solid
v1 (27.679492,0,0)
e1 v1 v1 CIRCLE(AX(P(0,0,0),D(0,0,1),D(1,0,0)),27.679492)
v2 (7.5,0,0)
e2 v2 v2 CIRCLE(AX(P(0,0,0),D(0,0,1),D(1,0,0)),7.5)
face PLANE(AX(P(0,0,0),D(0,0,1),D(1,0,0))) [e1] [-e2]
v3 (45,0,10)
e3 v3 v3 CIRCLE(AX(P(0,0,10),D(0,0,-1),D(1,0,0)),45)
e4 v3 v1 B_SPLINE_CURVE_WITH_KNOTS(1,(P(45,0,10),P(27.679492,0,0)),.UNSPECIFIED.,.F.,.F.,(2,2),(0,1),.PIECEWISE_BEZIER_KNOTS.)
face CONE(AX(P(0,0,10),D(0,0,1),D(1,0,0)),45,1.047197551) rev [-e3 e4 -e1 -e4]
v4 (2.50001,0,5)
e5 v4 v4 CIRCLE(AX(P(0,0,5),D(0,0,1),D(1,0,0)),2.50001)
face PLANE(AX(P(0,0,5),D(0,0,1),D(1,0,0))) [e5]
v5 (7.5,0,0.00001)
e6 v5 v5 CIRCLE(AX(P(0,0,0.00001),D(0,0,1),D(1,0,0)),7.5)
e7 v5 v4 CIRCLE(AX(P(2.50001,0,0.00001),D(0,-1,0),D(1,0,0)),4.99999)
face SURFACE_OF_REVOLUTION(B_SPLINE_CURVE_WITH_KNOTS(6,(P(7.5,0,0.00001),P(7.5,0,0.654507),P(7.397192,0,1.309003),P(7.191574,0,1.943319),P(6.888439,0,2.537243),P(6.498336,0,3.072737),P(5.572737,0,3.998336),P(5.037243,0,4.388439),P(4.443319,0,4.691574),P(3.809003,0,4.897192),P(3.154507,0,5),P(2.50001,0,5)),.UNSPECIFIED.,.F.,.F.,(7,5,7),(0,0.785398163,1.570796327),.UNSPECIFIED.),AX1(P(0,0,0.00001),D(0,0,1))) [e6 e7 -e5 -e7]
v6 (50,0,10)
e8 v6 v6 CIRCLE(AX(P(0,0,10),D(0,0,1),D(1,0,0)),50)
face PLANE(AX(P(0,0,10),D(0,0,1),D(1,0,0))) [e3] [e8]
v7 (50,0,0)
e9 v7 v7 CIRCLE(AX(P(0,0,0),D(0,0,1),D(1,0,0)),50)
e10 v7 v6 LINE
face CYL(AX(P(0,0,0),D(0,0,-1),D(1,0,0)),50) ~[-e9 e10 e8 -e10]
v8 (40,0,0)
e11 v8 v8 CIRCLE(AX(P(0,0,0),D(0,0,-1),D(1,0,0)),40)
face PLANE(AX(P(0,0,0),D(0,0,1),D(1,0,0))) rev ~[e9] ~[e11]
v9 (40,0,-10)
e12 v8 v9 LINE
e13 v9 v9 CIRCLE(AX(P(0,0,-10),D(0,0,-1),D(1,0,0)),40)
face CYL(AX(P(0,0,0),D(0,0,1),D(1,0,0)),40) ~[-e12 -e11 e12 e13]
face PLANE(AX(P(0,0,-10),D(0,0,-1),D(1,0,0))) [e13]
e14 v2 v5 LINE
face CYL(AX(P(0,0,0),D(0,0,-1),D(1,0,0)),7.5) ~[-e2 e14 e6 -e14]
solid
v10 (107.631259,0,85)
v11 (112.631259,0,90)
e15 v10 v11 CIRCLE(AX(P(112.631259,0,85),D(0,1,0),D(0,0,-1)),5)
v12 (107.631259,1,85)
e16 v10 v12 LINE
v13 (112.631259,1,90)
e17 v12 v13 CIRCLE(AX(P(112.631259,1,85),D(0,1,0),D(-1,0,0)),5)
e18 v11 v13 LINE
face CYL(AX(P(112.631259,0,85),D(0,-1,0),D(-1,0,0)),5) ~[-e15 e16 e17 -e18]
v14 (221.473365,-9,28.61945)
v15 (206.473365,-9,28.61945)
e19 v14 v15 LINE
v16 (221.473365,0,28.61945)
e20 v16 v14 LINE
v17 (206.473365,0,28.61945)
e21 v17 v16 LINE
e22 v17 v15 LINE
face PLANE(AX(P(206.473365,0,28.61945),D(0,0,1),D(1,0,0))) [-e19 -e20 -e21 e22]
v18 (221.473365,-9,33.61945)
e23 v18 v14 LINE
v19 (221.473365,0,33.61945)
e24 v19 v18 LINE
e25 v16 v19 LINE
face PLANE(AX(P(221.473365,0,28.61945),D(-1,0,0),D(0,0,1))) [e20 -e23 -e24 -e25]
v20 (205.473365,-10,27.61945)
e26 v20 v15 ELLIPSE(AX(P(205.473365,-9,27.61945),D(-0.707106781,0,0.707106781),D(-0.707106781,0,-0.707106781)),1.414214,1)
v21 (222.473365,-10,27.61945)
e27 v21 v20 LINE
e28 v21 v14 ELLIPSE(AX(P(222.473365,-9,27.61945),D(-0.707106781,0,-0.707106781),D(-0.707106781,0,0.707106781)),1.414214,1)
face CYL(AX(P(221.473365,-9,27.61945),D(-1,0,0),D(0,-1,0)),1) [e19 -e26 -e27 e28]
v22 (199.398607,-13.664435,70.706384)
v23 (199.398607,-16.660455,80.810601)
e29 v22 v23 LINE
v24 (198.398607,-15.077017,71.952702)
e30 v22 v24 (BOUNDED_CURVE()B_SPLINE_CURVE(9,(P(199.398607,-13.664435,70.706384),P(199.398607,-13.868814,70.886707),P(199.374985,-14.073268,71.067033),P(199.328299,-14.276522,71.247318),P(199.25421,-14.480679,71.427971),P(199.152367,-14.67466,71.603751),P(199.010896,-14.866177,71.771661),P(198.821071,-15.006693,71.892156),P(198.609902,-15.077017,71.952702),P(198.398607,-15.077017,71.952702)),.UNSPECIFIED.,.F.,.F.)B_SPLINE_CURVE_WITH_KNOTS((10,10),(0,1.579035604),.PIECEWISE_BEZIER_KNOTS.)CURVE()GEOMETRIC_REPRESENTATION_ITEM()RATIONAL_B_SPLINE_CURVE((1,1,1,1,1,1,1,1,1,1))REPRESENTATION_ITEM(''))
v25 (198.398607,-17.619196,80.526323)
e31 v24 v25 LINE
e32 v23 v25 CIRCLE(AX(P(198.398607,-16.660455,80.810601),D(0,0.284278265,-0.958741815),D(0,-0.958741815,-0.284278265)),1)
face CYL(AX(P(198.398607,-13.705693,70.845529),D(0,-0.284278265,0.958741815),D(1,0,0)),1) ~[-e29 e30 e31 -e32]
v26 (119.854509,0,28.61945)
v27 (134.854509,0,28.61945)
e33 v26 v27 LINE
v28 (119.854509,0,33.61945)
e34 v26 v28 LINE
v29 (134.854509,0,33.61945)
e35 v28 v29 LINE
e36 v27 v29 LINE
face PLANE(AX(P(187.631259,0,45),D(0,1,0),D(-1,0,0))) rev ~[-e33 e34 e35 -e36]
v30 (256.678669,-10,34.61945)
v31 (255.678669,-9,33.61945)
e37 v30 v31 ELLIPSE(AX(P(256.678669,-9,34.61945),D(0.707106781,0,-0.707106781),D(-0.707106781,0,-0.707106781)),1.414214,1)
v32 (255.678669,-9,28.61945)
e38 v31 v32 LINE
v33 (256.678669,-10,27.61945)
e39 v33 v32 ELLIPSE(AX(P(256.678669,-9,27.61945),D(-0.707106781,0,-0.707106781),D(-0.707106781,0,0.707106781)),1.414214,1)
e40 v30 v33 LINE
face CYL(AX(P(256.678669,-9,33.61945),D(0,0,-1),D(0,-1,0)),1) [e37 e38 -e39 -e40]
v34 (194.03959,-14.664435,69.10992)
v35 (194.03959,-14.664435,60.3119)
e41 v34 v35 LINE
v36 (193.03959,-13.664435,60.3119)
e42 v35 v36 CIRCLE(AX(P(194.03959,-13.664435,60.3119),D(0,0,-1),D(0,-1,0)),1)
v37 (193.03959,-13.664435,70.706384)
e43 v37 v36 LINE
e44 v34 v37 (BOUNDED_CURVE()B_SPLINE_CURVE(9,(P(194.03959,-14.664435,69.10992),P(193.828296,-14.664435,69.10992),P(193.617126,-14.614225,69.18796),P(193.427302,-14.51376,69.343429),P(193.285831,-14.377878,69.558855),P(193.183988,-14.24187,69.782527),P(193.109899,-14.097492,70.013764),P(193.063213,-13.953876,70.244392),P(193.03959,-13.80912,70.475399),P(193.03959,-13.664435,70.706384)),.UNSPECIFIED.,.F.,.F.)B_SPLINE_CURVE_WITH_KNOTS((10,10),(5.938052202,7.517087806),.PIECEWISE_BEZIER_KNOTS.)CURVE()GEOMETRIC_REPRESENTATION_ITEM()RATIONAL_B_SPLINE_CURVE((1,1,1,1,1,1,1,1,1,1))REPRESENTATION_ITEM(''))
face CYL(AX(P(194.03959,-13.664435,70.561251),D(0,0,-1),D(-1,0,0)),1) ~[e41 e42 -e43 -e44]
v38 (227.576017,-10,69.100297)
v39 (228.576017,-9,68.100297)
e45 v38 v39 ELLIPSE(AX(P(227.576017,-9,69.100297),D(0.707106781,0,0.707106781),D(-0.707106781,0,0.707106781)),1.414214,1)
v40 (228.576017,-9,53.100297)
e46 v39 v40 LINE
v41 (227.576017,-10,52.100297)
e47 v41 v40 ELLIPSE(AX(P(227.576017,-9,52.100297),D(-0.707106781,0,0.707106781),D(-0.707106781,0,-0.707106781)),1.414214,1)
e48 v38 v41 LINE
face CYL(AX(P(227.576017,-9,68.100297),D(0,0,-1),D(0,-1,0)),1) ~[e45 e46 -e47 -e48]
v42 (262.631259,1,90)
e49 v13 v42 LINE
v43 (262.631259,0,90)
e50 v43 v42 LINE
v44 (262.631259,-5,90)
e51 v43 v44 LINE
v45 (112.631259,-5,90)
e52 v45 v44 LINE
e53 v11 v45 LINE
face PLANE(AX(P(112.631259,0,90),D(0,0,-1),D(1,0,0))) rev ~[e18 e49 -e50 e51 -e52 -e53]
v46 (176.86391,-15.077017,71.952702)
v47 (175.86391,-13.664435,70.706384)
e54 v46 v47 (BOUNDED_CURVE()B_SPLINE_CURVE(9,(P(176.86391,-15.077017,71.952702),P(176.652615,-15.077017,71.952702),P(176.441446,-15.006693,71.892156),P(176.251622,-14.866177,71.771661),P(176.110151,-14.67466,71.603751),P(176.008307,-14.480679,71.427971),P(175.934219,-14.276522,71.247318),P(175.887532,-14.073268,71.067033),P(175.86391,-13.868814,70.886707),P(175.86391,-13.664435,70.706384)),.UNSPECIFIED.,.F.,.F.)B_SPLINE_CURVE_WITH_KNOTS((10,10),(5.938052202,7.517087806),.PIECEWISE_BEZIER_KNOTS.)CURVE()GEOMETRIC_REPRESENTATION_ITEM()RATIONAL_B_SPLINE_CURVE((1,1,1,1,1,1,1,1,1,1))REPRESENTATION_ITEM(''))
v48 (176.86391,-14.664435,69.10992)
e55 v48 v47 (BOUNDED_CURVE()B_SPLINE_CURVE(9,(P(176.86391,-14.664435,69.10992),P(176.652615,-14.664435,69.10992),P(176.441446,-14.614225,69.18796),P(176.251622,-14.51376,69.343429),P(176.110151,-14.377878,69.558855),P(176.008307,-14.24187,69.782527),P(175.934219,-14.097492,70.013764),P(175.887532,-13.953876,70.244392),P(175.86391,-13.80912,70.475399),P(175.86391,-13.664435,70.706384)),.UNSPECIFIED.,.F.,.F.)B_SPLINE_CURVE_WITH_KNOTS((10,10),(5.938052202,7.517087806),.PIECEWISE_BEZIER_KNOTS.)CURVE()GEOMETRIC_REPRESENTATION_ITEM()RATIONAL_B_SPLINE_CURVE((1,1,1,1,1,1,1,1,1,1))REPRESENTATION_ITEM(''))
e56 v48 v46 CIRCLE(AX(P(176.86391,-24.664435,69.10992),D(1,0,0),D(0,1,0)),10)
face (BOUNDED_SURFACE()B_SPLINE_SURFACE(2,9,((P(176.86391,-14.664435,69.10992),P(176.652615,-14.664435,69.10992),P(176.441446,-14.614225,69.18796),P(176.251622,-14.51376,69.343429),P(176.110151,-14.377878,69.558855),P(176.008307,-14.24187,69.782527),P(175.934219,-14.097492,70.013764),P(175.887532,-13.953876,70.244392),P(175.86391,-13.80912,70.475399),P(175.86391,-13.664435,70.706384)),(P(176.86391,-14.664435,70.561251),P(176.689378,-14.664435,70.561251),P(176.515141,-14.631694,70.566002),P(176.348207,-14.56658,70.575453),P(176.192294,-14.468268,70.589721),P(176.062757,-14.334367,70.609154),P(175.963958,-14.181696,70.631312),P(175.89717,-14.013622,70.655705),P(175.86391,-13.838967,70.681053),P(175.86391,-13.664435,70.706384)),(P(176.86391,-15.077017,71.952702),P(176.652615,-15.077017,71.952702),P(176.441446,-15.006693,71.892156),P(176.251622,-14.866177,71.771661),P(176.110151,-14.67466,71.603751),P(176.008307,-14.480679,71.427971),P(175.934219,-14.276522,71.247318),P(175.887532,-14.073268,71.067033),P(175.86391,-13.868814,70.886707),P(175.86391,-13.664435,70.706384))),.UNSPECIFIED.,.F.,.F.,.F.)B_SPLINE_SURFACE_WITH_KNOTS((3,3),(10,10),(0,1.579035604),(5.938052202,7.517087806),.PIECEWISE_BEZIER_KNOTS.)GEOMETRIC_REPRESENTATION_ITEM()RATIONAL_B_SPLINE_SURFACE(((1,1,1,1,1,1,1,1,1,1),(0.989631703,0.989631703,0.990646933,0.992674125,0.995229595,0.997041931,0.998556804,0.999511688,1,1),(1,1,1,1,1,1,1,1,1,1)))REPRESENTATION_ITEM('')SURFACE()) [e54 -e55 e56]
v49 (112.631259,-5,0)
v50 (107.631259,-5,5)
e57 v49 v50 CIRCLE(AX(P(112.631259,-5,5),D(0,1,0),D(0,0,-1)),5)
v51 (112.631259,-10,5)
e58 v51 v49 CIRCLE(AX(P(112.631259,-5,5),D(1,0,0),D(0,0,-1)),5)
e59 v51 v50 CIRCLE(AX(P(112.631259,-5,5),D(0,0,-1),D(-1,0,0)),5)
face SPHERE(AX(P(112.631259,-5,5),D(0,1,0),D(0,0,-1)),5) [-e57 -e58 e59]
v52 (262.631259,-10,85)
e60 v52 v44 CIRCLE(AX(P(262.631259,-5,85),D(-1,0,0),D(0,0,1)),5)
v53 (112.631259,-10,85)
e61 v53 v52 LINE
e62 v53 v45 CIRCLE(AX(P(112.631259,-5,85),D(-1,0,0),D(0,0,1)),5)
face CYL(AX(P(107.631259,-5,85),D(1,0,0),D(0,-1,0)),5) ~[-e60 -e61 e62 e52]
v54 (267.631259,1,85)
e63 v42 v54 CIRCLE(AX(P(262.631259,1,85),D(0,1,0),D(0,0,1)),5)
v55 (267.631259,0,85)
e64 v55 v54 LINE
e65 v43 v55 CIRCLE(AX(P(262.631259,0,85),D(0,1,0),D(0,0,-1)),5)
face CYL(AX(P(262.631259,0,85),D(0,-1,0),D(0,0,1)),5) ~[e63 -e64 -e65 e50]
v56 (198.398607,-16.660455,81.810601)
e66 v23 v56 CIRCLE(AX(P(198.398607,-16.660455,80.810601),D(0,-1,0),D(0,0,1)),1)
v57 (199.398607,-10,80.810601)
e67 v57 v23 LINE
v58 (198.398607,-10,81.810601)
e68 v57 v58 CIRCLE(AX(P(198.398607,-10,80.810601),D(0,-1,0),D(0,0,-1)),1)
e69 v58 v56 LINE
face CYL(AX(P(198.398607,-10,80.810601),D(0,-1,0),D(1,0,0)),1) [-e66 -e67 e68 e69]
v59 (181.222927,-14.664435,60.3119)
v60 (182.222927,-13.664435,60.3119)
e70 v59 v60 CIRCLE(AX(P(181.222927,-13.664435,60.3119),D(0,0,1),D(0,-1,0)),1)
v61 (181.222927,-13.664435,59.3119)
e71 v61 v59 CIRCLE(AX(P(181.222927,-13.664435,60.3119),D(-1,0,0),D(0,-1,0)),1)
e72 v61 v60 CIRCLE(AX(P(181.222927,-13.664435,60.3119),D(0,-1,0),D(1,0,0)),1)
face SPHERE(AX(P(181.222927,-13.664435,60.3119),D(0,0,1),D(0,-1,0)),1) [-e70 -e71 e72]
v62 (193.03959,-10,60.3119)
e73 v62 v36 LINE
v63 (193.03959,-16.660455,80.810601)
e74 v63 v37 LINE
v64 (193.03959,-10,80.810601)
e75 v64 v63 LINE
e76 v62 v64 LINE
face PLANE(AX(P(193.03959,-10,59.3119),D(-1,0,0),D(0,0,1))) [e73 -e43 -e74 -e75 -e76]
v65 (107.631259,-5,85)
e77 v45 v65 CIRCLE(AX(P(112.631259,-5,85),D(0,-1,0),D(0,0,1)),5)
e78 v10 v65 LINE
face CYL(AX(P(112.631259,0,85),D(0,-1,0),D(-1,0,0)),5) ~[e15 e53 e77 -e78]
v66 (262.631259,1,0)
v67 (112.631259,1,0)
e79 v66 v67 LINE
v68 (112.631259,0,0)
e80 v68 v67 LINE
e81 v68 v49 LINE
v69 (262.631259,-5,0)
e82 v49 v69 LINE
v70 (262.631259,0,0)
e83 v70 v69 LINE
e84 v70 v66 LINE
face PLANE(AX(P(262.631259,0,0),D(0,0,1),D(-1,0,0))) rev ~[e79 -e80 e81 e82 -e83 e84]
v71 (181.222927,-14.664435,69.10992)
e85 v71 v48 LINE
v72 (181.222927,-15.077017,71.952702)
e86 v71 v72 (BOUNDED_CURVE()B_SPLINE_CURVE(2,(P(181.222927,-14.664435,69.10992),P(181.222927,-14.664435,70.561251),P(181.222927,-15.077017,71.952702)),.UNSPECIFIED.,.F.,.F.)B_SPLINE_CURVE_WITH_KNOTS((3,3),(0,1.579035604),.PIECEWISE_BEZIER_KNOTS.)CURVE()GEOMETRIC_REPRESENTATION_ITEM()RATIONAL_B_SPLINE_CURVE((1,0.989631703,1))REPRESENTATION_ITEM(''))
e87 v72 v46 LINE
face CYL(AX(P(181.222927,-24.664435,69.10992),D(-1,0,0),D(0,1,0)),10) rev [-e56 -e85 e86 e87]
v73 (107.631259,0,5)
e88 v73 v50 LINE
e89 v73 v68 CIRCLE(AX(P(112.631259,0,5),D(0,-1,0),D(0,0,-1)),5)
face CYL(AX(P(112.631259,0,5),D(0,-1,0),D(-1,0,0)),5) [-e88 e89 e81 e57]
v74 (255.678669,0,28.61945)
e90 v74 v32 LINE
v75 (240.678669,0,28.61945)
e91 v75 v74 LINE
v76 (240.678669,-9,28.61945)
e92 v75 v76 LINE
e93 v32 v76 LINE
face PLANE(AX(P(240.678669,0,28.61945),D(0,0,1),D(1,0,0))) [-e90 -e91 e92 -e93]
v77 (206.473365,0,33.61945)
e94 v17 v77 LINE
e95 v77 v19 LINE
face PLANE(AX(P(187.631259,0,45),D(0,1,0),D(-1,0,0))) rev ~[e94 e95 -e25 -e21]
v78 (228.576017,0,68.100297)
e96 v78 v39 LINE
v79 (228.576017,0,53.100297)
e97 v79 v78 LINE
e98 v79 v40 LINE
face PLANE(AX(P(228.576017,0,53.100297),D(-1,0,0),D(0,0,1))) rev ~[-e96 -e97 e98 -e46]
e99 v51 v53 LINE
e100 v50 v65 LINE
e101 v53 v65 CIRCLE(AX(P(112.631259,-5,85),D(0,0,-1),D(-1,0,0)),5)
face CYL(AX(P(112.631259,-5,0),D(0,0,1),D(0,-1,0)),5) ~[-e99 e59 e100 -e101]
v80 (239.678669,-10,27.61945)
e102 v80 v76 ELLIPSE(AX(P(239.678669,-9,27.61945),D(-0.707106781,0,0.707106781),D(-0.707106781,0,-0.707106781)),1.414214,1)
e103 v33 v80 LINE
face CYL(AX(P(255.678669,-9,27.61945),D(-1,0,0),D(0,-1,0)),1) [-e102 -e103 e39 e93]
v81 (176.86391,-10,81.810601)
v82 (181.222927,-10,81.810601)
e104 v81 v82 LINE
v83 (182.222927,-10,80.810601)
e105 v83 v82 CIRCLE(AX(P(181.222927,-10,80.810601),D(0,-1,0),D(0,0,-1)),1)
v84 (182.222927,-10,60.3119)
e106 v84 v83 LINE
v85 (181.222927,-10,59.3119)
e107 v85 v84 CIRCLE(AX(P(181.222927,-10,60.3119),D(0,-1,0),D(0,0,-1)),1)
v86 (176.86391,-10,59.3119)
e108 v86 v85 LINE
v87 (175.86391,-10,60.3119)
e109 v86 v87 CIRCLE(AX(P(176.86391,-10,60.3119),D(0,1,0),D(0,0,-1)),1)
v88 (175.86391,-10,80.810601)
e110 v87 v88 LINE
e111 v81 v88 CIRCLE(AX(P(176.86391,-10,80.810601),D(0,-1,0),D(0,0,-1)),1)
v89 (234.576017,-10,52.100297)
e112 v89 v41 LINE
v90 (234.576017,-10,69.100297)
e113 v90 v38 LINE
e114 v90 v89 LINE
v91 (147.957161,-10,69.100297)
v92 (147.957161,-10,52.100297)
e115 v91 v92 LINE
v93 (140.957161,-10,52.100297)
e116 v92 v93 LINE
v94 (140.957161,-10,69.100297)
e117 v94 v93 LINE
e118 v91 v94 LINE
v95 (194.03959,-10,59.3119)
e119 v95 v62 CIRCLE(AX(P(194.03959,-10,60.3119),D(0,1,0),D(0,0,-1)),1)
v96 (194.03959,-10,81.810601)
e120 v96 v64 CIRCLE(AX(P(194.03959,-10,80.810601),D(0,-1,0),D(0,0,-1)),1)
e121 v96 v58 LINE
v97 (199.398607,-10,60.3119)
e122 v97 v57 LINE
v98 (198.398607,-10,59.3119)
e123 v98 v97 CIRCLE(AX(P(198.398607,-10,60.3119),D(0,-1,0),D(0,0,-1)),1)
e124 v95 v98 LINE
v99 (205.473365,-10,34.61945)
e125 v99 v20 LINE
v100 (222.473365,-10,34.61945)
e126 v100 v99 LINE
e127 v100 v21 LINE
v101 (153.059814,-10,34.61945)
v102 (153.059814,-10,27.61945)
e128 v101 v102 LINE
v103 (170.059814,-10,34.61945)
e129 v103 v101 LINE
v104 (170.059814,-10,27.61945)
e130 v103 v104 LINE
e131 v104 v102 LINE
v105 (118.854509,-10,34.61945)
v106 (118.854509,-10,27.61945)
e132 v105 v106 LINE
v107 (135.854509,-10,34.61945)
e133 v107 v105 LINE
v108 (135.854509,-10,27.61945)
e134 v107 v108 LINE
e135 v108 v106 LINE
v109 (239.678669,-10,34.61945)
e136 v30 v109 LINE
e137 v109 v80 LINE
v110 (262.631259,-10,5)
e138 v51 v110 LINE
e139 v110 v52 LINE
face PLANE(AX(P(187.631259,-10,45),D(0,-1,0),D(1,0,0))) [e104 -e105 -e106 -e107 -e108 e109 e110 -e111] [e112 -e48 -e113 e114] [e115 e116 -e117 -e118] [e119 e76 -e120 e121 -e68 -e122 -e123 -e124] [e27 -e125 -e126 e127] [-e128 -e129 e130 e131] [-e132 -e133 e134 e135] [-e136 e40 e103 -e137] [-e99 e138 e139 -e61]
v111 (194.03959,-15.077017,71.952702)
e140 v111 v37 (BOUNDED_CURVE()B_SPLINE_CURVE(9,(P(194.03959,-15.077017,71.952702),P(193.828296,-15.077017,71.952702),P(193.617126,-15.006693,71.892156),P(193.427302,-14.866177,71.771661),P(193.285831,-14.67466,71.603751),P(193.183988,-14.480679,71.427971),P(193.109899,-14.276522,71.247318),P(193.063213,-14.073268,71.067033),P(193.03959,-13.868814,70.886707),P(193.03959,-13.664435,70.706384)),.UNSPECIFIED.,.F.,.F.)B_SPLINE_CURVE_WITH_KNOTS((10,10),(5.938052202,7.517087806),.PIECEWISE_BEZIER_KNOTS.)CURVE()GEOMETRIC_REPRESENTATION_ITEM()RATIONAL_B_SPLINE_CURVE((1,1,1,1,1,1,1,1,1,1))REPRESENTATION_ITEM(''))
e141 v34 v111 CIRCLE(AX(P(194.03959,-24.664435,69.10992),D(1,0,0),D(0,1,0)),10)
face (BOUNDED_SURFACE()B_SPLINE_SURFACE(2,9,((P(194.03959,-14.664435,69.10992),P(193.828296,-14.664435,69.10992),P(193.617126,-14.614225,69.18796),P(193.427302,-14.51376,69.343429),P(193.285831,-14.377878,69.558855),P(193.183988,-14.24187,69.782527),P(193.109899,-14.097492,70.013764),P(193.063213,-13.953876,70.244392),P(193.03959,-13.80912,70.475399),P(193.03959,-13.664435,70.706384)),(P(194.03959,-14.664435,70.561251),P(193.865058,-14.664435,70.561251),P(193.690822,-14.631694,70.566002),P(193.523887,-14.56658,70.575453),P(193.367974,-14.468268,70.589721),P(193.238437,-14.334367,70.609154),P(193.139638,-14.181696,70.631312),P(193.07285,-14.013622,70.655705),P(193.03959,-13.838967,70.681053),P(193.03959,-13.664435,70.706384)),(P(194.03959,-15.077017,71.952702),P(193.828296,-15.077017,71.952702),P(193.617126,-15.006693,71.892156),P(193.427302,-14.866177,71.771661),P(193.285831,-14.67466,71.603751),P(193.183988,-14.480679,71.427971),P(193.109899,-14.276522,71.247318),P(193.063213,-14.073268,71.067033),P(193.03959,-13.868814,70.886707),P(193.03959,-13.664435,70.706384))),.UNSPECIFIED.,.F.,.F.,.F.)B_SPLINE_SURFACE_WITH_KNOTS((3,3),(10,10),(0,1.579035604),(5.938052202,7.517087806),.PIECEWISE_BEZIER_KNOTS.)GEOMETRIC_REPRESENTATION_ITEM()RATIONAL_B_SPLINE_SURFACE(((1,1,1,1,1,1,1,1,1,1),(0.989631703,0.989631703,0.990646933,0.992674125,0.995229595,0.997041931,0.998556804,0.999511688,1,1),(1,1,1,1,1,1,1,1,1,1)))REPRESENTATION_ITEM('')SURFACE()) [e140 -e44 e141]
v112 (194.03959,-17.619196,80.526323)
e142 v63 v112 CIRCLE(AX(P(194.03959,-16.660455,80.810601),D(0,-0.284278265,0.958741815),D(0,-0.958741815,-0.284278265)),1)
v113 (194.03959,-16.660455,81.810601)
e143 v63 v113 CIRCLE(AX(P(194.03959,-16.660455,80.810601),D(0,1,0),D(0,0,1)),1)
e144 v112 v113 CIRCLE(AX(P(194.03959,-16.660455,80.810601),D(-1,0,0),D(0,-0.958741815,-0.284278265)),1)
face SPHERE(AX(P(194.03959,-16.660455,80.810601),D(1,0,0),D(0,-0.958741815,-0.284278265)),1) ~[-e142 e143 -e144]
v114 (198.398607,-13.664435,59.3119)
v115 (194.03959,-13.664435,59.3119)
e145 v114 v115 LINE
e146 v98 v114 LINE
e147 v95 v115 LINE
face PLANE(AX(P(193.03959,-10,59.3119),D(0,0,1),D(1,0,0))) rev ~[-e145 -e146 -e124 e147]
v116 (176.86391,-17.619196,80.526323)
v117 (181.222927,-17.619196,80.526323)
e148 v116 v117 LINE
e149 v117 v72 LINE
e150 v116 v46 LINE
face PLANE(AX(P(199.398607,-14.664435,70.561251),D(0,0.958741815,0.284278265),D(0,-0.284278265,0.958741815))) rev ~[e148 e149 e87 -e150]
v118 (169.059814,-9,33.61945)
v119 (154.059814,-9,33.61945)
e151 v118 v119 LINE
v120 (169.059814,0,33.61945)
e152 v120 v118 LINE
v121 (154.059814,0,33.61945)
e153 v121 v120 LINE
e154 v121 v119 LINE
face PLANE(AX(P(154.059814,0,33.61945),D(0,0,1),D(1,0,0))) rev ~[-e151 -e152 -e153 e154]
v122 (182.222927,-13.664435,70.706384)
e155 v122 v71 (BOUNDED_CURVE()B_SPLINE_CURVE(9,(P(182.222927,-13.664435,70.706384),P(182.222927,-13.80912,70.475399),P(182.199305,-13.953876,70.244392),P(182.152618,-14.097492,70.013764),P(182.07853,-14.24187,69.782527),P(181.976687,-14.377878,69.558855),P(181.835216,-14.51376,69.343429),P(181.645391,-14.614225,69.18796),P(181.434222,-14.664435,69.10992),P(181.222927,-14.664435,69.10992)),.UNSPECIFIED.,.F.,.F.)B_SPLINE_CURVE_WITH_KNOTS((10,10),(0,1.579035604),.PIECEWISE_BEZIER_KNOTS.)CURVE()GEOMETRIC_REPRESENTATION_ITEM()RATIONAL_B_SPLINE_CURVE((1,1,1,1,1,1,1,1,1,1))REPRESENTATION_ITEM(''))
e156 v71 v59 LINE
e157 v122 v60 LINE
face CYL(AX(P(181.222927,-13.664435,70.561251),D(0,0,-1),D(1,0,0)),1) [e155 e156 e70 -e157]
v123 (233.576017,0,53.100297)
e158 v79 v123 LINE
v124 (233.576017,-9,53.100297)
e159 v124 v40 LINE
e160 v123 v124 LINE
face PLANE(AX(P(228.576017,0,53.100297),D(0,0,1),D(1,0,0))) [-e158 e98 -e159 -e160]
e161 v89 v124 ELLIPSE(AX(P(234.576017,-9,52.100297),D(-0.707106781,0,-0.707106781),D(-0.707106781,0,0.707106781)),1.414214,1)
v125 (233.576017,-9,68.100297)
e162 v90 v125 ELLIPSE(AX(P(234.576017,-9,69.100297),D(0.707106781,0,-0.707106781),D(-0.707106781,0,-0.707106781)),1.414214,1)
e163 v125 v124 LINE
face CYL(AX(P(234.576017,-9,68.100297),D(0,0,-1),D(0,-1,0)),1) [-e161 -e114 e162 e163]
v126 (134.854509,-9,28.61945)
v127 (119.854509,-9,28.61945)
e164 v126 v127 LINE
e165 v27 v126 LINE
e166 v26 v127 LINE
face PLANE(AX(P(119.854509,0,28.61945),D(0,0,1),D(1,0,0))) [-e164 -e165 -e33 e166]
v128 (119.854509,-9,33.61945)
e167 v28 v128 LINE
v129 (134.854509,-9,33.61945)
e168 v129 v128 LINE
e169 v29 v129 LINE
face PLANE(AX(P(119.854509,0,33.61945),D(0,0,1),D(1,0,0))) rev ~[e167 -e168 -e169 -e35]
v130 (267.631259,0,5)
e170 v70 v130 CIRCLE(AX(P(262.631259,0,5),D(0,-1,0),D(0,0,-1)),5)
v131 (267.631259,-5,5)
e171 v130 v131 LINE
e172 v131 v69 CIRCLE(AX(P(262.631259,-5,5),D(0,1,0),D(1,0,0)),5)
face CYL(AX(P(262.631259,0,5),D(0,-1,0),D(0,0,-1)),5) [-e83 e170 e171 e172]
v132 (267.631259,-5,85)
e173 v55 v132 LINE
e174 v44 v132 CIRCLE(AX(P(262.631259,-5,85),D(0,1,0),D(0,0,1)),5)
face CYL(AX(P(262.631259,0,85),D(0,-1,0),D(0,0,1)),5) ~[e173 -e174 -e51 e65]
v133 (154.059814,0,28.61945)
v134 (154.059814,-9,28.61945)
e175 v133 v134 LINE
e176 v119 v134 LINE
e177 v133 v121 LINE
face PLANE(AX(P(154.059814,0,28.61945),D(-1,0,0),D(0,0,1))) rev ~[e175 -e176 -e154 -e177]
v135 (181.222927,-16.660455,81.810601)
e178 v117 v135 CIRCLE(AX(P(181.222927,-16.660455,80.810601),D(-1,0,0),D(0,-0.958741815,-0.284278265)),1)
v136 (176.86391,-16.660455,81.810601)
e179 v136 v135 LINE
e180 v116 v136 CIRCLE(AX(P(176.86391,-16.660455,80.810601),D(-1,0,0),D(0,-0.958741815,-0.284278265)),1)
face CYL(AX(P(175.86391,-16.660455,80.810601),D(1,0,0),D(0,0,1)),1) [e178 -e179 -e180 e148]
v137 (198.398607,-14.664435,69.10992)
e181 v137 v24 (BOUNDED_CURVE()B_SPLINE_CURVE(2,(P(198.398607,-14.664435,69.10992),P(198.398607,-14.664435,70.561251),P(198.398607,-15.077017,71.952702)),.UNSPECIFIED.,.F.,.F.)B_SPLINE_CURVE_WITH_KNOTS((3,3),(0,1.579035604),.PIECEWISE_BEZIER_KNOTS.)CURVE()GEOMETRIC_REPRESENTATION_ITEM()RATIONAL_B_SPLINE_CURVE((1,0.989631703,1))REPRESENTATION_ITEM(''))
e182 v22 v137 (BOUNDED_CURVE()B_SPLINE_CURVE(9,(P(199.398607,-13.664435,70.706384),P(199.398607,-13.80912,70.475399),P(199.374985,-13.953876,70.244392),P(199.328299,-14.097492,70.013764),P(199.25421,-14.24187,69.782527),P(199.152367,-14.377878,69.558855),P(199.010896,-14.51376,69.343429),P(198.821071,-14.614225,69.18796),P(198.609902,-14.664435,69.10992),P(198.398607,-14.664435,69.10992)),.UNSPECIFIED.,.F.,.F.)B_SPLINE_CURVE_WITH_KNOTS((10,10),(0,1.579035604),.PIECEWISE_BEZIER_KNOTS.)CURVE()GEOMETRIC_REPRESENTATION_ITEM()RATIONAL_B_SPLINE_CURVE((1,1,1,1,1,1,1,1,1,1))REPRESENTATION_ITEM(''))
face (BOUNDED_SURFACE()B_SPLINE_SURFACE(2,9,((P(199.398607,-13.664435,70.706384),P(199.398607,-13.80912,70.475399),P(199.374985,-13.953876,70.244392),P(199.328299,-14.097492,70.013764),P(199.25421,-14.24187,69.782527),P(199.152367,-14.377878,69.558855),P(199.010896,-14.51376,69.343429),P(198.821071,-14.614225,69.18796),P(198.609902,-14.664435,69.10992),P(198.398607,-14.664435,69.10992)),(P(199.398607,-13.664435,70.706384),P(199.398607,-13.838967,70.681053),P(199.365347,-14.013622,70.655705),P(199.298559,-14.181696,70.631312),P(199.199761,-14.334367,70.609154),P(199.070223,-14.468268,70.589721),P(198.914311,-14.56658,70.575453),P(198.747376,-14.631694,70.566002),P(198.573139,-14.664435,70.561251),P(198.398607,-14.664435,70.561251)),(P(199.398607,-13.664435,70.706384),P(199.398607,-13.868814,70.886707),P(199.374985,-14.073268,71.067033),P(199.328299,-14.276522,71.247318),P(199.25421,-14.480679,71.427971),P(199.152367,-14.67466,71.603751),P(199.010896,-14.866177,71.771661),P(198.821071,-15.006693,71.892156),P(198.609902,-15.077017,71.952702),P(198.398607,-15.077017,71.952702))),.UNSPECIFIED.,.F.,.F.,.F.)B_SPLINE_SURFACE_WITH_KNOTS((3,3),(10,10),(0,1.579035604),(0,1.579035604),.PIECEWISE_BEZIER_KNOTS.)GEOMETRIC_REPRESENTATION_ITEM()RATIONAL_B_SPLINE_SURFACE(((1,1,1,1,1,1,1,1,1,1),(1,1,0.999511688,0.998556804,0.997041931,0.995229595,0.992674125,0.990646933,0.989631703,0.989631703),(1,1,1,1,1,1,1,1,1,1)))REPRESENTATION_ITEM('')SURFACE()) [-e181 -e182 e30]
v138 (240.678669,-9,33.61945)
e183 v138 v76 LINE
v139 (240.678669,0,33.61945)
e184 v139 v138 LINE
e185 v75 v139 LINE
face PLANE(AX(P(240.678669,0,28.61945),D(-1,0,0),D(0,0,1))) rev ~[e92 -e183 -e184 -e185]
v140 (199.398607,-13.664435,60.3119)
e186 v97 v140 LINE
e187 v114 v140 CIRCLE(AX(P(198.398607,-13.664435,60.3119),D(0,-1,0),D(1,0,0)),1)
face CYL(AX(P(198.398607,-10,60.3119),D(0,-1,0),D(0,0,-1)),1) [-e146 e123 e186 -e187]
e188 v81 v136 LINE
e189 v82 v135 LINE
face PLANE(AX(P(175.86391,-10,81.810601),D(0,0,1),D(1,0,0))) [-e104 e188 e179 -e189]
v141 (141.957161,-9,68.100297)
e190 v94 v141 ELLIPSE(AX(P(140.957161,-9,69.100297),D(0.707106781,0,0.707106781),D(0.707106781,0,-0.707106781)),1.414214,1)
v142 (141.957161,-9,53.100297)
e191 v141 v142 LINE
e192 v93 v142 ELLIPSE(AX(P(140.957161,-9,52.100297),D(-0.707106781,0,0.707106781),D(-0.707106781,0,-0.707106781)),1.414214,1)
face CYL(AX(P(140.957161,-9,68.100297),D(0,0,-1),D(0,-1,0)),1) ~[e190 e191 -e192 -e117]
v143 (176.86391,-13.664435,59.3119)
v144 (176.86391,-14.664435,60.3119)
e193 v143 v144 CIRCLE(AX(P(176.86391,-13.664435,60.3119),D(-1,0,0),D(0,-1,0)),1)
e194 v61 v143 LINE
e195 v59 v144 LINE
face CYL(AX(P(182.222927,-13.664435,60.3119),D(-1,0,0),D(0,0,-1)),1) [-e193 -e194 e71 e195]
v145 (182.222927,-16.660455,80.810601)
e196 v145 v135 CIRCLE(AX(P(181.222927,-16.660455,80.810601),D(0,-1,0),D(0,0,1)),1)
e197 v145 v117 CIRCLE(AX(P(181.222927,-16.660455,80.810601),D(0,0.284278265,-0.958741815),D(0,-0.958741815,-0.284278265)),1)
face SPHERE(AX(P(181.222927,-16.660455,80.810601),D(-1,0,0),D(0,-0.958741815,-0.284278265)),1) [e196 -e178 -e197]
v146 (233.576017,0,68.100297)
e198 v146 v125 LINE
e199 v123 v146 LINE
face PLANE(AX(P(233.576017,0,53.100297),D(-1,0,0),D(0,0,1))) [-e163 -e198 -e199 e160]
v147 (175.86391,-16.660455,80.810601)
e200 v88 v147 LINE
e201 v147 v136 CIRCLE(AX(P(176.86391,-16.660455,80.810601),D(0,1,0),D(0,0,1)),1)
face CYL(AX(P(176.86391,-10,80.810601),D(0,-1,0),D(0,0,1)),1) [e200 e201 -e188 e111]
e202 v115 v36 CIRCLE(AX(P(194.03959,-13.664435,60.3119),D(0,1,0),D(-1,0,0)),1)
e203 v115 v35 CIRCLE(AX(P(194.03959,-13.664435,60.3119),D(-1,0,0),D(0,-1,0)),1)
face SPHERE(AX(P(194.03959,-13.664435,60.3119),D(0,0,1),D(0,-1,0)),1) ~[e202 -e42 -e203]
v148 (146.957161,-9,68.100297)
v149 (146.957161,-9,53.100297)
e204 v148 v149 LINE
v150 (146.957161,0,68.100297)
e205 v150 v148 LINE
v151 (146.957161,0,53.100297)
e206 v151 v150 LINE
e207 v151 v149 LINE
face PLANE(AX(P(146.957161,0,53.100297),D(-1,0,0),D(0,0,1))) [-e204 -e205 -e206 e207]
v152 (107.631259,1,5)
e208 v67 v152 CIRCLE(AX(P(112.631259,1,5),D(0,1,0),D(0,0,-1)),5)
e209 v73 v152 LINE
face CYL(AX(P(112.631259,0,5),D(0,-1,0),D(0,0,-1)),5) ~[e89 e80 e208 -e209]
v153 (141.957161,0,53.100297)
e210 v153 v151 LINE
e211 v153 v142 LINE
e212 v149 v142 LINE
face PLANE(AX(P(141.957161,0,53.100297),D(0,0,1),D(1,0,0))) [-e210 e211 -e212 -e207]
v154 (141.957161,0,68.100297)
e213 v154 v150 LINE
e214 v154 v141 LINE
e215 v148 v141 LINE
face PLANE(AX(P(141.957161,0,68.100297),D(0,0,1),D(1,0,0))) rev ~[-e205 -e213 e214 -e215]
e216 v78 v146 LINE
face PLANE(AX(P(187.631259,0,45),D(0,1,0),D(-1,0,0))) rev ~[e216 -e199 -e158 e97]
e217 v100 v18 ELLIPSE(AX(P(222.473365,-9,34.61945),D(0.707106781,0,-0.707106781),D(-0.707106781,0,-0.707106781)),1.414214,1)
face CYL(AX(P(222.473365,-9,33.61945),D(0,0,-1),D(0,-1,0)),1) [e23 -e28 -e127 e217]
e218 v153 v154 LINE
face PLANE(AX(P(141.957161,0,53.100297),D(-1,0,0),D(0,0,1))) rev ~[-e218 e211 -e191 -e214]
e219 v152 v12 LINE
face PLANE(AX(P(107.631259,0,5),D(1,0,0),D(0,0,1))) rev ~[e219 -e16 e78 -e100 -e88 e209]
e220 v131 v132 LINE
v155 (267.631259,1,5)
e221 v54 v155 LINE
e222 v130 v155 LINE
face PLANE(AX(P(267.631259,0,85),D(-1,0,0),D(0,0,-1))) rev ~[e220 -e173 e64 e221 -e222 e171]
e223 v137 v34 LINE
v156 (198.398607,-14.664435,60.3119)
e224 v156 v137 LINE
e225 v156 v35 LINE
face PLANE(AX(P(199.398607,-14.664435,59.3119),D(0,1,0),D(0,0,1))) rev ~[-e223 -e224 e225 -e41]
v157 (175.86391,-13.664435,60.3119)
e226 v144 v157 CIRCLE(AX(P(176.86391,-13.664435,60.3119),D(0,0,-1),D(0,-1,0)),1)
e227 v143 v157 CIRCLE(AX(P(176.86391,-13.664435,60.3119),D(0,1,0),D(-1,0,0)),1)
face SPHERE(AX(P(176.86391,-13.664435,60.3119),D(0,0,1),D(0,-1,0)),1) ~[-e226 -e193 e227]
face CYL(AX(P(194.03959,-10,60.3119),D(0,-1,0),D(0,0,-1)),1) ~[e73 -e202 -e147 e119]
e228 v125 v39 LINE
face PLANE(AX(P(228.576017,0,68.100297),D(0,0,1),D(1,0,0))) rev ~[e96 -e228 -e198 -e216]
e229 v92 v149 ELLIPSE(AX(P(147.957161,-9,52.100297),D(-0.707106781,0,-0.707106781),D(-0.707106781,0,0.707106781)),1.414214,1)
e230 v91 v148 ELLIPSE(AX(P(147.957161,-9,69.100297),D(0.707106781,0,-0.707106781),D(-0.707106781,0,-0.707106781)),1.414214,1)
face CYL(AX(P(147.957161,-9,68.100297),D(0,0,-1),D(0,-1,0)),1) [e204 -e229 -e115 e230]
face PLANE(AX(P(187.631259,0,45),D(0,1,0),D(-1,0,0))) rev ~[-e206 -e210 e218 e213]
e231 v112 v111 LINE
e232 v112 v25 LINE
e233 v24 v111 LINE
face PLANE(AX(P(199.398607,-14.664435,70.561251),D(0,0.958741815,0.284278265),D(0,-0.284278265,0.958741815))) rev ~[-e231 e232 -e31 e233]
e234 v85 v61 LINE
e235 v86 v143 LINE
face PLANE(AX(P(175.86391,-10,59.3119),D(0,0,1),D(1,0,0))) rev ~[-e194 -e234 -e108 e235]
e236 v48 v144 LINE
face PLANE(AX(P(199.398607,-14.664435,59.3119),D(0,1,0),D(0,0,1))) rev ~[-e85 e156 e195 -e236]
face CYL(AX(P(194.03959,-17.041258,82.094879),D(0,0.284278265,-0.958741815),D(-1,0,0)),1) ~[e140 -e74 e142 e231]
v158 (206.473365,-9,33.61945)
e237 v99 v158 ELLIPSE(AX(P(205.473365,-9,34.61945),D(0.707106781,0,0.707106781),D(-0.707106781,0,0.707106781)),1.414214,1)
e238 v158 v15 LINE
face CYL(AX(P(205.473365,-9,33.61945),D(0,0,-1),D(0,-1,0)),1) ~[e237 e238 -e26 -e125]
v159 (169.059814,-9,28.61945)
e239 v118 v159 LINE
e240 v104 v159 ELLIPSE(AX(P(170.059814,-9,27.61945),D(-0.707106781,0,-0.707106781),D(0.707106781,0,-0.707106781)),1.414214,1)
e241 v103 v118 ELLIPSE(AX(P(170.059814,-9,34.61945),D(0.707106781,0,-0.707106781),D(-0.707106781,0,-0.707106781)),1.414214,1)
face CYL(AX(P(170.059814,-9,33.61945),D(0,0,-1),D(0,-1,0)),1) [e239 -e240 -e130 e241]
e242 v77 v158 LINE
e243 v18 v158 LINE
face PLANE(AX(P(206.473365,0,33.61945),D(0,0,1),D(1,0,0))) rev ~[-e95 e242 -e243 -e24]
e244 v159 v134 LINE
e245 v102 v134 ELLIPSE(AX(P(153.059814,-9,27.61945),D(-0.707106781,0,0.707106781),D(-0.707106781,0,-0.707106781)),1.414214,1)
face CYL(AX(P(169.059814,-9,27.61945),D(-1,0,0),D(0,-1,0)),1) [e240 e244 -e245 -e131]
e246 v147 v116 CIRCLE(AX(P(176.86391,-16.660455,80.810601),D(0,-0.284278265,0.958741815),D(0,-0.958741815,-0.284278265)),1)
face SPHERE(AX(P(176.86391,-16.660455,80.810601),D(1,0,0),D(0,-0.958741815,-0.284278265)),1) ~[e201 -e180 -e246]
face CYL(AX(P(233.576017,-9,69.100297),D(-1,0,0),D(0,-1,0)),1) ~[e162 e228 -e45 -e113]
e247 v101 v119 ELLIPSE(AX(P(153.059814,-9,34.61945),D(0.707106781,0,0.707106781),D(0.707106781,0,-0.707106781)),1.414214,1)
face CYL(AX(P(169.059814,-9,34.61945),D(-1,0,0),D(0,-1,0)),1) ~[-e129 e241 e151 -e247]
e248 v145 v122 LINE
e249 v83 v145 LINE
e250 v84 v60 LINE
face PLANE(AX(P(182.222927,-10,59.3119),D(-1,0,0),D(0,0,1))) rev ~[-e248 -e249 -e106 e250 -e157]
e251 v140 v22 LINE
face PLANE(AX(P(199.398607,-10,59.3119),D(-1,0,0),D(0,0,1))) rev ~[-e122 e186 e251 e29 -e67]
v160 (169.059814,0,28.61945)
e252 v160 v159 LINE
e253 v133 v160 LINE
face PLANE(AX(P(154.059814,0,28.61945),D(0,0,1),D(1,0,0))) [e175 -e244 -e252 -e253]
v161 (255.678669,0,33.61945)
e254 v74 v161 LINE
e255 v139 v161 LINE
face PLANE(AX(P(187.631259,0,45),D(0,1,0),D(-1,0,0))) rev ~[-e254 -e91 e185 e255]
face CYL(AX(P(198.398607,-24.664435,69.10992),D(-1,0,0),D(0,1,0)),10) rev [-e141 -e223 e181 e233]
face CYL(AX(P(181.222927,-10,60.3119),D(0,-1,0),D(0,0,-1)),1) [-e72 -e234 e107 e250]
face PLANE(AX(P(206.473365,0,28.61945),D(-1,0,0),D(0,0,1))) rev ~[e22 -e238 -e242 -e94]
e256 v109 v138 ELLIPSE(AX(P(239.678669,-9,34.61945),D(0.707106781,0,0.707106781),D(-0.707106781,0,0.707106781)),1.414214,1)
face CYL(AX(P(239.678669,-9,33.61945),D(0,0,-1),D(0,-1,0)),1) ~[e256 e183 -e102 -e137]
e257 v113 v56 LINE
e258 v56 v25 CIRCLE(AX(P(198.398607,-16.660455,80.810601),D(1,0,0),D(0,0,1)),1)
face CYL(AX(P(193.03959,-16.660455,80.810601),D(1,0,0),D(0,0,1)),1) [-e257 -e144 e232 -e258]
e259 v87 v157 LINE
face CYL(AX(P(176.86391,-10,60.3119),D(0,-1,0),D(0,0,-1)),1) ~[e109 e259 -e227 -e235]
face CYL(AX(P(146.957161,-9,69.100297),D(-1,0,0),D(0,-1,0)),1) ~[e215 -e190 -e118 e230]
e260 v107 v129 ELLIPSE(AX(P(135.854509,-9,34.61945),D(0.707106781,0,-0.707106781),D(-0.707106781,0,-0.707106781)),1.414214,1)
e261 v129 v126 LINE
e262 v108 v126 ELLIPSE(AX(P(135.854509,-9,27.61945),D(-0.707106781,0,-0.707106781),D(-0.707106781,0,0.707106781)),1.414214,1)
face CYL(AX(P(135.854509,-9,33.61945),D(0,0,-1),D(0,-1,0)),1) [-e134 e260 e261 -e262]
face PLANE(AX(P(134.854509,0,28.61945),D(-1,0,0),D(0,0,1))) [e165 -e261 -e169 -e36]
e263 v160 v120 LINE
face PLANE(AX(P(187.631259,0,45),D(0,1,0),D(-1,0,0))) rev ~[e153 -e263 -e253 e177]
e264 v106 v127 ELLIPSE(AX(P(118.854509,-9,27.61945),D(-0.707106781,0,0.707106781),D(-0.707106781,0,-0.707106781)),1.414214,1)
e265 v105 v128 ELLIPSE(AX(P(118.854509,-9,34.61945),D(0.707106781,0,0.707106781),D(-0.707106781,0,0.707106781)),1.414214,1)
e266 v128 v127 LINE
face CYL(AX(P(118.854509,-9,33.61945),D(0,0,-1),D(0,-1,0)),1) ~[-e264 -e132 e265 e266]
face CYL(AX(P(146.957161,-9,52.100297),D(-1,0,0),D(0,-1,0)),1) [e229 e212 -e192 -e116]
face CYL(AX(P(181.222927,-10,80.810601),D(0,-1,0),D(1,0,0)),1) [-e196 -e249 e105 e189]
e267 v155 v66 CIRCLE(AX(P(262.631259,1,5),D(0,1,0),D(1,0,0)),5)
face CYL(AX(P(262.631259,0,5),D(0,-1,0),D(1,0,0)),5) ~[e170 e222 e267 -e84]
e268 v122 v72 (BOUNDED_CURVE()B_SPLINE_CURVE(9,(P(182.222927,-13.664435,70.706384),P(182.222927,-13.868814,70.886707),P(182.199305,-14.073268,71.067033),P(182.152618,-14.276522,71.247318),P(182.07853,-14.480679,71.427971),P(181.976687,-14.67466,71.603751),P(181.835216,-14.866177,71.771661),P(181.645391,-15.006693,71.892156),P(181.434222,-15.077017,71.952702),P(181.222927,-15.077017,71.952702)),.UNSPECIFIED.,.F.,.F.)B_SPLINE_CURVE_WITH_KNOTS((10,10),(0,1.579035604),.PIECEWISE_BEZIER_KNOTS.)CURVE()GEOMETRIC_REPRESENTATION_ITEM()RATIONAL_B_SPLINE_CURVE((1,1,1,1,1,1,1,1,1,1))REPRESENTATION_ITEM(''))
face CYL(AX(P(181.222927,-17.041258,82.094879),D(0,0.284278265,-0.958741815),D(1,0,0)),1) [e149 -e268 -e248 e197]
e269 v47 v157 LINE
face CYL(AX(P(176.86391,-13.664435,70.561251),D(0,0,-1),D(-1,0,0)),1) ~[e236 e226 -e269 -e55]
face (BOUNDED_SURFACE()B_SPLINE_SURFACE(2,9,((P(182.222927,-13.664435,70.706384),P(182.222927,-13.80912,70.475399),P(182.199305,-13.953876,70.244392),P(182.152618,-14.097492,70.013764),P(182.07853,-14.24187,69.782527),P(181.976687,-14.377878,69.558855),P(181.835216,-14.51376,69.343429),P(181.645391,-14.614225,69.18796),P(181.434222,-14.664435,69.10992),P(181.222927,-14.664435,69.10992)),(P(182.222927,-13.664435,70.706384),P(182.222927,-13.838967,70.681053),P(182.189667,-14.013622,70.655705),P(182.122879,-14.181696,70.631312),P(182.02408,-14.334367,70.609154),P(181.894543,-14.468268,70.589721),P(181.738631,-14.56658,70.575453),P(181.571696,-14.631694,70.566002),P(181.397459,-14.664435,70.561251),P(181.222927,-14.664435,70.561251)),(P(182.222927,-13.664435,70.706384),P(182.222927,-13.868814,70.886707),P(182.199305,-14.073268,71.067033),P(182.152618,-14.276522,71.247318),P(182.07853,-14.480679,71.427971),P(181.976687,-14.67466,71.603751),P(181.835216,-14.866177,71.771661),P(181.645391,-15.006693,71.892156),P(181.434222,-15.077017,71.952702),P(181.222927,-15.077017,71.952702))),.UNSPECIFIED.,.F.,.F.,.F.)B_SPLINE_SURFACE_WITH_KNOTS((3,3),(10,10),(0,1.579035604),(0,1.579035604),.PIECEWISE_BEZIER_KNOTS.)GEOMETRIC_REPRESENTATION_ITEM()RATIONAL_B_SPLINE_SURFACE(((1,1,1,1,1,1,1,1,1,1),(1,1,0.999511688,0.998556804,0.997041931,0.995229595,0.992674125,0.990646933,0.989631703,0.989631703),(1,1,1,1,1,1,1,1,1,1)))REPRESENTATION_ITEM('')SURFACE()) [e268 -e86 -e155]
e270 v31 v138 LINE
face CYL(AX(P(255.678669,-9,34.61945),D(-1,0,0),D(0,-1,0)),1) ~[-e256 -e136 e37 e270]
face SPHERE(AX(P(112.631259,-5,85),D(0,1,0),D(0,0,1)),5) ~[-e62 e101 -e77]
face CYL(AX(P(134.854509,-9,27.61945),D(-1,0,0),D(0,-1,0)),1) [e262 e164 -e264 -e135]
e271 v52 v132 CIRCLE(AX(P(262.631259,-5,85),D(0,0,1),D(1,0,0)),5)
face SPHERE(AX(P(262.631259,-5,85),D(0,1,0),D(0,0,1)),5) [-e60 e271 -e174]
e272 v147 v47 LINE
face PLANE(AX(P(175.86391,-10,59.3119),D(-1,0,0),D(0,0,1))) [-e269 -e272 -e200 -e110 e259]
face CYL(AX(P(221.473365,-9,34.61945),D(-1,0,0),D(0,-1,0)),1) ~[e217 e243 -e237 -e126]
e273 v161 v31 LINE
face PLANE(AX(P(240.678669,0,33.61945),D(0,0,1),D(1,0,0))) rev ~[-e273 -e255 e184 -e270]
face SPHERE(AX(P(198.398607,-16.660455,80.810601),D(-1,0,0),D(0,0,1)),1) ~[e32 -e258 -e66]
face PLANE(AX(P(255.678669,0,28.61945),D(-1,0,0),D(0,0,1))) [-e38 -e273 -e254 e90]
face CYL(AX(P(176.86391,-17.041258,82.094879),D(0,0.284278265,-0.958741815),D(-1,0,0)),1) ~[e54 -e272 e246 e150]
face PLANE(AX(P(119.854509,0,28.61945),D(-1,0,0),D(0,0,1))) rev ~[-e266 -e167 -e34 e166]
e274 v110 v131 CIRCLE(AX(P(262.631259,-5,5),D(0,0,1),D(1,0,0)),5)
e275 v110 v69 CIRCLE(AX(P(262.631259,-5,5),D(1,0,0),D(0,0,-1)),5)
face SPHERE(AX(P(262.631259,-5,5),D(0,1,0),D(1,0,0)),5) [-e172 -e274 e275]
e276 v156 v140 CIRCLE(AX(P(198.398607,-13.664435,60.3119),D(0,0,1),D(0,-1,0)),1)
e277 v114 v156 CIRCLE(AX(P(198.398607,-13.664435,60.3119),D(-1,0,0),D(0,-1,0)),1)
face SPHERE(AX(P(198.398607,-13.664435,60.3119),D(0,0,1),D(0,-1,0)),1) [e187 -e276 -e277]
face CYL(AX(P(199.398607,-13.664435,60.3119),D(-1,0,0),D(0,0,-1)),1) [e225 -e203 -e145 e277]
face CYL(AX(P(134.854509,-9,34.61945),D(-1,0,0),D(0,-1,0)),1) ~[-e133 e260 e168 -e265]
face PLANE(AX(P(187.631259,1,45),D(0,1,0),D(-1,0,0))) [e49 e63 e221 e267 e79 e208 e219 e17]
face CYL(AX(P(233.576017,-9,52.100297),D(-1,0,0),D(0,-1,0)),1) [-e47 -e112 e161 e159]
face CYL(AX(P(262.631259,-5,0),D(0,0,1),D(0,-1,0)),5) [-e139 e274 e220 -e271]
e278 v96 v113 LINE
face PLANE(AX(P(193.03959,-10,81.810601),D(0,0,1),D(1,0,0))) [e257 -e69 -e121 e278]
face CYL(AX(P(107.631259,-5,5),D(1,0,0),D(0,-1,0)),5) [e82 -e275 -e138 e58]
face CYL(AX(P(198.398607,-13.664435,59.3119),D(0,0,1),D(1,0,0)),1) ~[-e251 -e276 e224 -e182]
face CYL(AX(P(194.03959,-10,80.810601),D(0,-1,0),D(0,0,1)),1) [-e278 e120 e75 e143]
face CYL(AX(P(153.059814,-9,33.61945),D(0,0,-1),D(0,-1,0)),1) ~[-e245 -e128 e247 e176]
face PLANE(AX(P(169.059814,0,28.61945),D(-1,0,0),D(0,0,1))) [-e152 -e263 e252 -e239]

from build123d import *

# Parameters (mm, degrees)
F0_R      = 50
F1_DEPTH  = 10
F2_R      = 40
F3_DEPTH  = 10
F4_R      = 45
F5_DEPTH  = 10
F5_TAPER  = 60
F6_R      = 7.5
F7_DEPTH  = 5
F8_R      = 4.99999
F9_W      = 160
F9_H      = 90
F10_DEPTH = 10
F11_W     = 5
F11_H     = 15
F11_W_2   = 15
F11_H_2   = 5
F12_DEPTH = 15
F13_W     = 6.3590165973
F13_H     = 22.4987007678
F14_DEPTH = 8
F16_DEPTH = 25
F17_R     = 1
F18_R     = 10
F19_R     = 1
F20_R     = 5
F22_DEPTH = 1


# Not quite as in the source:
# - a fillet or chamfer is up to 0.001 mm smaller than in the source, because OpenCascade refuses the exact size


with BuildPart() as f1:
    # F0 (on Top) → F1 (new body)
    with BuildSketch(Plane.XY):
        Circle(F0_R)
    extrude(amount=F1_DEPTH)

    # F2 (on face) → F3 (join)
    with BuildSketch(Plane(origin=(0, 0, 0), x_dir=(1, 0, 0), z_dir=(0, 0, -1))):
        Circle(F2_R)
    extrude(amount=F3_DEPTH)

    # F4 (on face) → F5 (cut)
    with BuildSketch(Plane.XY.offset(10)):
        Circle(F4_R)
    extrude(amount=-F5_DEPTH, taper=F5_TAPER, mode=Mode.SUBTRACT)

    # F6 (on face) → F7 (join)
    with BuildSketch(Plane.XY):
        Circle(F6_R)
    extrude(amount=F7_DEPTH)

    # F8 (radius 5 in the source; OpenCascade refuses exactly that, so slightly less here)
    f8_edges = [f1.edges().sort_by_distance(p)[0] for p in [
        (-7.5, 0, 5),
    ]]
    fillet(f8_edges, radius=F8_R)


with BuildPart() as f10:
    # F9 (on Front) → F10 (new body)
    with BuildSketch(Plane.XZ):
        with Locations((187.6312586665, 45)):
            Rectangle(F9_W, F9_H)
    extrude(amount=F10_DEPTH)

    # F11 (on Front) → F12 (cut)
    with BuildSketch(Plane.XZ):
        with Locations((144.4571614265, 60.6002969737)):
            Rectangle(F11_W, F11_H)
        with Locations((127.3545090962, 31.1194501932)):
            Rectangle(F11_W_2, F11_H_2)
        with Locations((161.5598137569, 31.1194501932)):
            Rectangle(F11_W_2, F11_H_2)
        with Locations((231.0760170221, 60.6002969737)):
            Rectangle(F11_W, F11_H)
        with Locations((213.9733646918, 31.1194501932)):
            Rectangle(F11_W_2, F11_H_2)
        with Locations((248.1786693525, 31.1194501932)):
            Rectangle(F11_W_2, F11_H_2)
    extrude(amount=F12_DEPTH, mode=Mode.SUBTRACT)

    # F13 (on face) → F14 (join)
    with BuildSketch(Plane.XZ.offset(10)):
        with Locations((196.219098717, 70.5612506717)):
            Rectangle(F13_W, F13_H)
        with Locations((179.0434186161, 70.5612506717)):
            Rectangle(F13_W, F13_H)
    extrude(amount=F14_DEPTH)

    # F15 (on face) → F16 (cut)
    with BuildSketch(Plane.YZ.offset(199.3986070156)):
        Polygon((-14.6644348279, 59.3119002879), (-14.6644348279, 70.5612506717), (-18, 81.8106010556), (-18, 59.3119002879), align=None)
    extrude(amount=-F16_DEPTH, mode=Mode.SUBTRACT)

    # F17
    f17_edges = [f10.edges().sort_by_distance(p)[0] for p in [
        (199.398607, -14.664435, 64.936575),
        (199.398607, -16.332217, 76.185926),
        (196.219099, -18, 81.810601),
        (179.043419, -18, 81.810601),
        (193.03959, -16.332217, 76.185926),
        (193.03959, -14.664435, 64.936575),
        (196.219099, -14.664435, 59.3119),
        (199.398607, -14, 81.810601),
        (199.398607, -12.332217, 59.3119),
        (193.03959, -12.332217, 59.3119),
        (193.03959, -14, 81.810601),
        (182.222927, -14.664435, 64.936575),
        (182.222927, -16.332217, 76.185926),
        (175.86391, -16.332217, 76.185926),
        (175.86391, -14.664435, 64.936575),
        (179.043419, -14.664435, 59.3119),
        (175.86391, -12.332217, 59.3119),
        (182.222927, -12.332217, 59.3119),
        (182.222927, -14, 81.810601),
        (175.86391, -14, 81.810601),
    ]]
    fillet(f17_edges, radius=F17_R)

    # F18
    f18_edges = [f10.edges().sort_by_distance(p)[0] for p in [
        (179.043419, -14.664435, 70.561251),
        (196.219099, -14.664435, 70.561251),
    ]]
    fillet(f18_edges, radius=F18_R)

    # F19
    f19_edges = [f10.edges().sort_by_distance(p)[0] for p in [
        (141.957161, -10, 60.600297),
        (144.457161, -10, 53.100297),
        (146.957161, -10, 60.600297),
        (144.457161, -10, 68.100297),
        (127.354509, -10, 33.61945),
        (119.854509, -10, 31.11945),
        (127.354509, -10, 28.61945),
        (134.854509, -10, 31.11945),
        (154.059814, -10, 31.11945),
        (161.559814, -10, 33.61945),
        (169.059814, -10, 31.11945),
        (161.559814, -10, 28.61945),
        (213.973365, -10, 28.61945),
        (213.973365, -10, 33.61945),
        (206.473365, -10, 31.11945),
        (221.473365, -10, 31.11945),
        (248.178669, -10, 33.61945),
        (240.678669, -10, 31.11945),
        (248.178669, -10, 28.61945),
        (255.678669, -10, 31.11945),
        (231.076017, -10, 68.100297),
        (228.576017, -10, 60.600297),
        (231.076017, -10, 53.100297),
        (233.576017, -10, 60.600297),
    ]]
    fillet(f19_edges, radius=F19_R)

    # F20
    f20_edges = [f10.edges().sort_by_distance(p)[0] for p in [
        (267.631259, -5, 90),
        (107.631259, -5, 90),
        (107.631259, -5, 0),
        (267.631259, -5, 0),
        (187.631259, -10, 90),
        (267.631259, -10, 45),
        (187.631259, -10, 0),
        (107.631259, -10, 45),
    ]]
    fillet(f20_edges, radius=F20_R)

    # F21 (on face) → F22 (join)
    with BuildSketch(Plane(origin=(0, 0, 0), x_dir=(-1, 0, 0), z_dir=(0, 1, 0))):
        with BuildLine():
            Line((-262.6312586665, 0), (-112.6312586665, 0))
            ThreePointArc((-112.6312586665, 0), (-109.0957247606, 1.4644660941), (-107.6312586665, 5))
            Line((-107.6312586665, 5), (-107.6312586665, 85))
            ThreePointArc((-107.6312586665, 85), (-109.0957247606, 88.5355339059), (-112.6312586665, 90))
            Line((-112.6312586665, 90), (-262.6312586665, 90))
            ThreePointArc((-262.6312586665, 90), (-266.1667925724, 88.5355339059), (-267.6312586665, 85))
            Line((-267.6312586665, 85), (-267.6312586665, 5))
            ThreePointArc((-267.6312586665, 5), (-266.1667925724, 1.4644660941), (-262.6312586665, 0))
        make_face()
    extrude(amount=F22_DEPTH)


solid = Compound([f1.part, f10.part])
